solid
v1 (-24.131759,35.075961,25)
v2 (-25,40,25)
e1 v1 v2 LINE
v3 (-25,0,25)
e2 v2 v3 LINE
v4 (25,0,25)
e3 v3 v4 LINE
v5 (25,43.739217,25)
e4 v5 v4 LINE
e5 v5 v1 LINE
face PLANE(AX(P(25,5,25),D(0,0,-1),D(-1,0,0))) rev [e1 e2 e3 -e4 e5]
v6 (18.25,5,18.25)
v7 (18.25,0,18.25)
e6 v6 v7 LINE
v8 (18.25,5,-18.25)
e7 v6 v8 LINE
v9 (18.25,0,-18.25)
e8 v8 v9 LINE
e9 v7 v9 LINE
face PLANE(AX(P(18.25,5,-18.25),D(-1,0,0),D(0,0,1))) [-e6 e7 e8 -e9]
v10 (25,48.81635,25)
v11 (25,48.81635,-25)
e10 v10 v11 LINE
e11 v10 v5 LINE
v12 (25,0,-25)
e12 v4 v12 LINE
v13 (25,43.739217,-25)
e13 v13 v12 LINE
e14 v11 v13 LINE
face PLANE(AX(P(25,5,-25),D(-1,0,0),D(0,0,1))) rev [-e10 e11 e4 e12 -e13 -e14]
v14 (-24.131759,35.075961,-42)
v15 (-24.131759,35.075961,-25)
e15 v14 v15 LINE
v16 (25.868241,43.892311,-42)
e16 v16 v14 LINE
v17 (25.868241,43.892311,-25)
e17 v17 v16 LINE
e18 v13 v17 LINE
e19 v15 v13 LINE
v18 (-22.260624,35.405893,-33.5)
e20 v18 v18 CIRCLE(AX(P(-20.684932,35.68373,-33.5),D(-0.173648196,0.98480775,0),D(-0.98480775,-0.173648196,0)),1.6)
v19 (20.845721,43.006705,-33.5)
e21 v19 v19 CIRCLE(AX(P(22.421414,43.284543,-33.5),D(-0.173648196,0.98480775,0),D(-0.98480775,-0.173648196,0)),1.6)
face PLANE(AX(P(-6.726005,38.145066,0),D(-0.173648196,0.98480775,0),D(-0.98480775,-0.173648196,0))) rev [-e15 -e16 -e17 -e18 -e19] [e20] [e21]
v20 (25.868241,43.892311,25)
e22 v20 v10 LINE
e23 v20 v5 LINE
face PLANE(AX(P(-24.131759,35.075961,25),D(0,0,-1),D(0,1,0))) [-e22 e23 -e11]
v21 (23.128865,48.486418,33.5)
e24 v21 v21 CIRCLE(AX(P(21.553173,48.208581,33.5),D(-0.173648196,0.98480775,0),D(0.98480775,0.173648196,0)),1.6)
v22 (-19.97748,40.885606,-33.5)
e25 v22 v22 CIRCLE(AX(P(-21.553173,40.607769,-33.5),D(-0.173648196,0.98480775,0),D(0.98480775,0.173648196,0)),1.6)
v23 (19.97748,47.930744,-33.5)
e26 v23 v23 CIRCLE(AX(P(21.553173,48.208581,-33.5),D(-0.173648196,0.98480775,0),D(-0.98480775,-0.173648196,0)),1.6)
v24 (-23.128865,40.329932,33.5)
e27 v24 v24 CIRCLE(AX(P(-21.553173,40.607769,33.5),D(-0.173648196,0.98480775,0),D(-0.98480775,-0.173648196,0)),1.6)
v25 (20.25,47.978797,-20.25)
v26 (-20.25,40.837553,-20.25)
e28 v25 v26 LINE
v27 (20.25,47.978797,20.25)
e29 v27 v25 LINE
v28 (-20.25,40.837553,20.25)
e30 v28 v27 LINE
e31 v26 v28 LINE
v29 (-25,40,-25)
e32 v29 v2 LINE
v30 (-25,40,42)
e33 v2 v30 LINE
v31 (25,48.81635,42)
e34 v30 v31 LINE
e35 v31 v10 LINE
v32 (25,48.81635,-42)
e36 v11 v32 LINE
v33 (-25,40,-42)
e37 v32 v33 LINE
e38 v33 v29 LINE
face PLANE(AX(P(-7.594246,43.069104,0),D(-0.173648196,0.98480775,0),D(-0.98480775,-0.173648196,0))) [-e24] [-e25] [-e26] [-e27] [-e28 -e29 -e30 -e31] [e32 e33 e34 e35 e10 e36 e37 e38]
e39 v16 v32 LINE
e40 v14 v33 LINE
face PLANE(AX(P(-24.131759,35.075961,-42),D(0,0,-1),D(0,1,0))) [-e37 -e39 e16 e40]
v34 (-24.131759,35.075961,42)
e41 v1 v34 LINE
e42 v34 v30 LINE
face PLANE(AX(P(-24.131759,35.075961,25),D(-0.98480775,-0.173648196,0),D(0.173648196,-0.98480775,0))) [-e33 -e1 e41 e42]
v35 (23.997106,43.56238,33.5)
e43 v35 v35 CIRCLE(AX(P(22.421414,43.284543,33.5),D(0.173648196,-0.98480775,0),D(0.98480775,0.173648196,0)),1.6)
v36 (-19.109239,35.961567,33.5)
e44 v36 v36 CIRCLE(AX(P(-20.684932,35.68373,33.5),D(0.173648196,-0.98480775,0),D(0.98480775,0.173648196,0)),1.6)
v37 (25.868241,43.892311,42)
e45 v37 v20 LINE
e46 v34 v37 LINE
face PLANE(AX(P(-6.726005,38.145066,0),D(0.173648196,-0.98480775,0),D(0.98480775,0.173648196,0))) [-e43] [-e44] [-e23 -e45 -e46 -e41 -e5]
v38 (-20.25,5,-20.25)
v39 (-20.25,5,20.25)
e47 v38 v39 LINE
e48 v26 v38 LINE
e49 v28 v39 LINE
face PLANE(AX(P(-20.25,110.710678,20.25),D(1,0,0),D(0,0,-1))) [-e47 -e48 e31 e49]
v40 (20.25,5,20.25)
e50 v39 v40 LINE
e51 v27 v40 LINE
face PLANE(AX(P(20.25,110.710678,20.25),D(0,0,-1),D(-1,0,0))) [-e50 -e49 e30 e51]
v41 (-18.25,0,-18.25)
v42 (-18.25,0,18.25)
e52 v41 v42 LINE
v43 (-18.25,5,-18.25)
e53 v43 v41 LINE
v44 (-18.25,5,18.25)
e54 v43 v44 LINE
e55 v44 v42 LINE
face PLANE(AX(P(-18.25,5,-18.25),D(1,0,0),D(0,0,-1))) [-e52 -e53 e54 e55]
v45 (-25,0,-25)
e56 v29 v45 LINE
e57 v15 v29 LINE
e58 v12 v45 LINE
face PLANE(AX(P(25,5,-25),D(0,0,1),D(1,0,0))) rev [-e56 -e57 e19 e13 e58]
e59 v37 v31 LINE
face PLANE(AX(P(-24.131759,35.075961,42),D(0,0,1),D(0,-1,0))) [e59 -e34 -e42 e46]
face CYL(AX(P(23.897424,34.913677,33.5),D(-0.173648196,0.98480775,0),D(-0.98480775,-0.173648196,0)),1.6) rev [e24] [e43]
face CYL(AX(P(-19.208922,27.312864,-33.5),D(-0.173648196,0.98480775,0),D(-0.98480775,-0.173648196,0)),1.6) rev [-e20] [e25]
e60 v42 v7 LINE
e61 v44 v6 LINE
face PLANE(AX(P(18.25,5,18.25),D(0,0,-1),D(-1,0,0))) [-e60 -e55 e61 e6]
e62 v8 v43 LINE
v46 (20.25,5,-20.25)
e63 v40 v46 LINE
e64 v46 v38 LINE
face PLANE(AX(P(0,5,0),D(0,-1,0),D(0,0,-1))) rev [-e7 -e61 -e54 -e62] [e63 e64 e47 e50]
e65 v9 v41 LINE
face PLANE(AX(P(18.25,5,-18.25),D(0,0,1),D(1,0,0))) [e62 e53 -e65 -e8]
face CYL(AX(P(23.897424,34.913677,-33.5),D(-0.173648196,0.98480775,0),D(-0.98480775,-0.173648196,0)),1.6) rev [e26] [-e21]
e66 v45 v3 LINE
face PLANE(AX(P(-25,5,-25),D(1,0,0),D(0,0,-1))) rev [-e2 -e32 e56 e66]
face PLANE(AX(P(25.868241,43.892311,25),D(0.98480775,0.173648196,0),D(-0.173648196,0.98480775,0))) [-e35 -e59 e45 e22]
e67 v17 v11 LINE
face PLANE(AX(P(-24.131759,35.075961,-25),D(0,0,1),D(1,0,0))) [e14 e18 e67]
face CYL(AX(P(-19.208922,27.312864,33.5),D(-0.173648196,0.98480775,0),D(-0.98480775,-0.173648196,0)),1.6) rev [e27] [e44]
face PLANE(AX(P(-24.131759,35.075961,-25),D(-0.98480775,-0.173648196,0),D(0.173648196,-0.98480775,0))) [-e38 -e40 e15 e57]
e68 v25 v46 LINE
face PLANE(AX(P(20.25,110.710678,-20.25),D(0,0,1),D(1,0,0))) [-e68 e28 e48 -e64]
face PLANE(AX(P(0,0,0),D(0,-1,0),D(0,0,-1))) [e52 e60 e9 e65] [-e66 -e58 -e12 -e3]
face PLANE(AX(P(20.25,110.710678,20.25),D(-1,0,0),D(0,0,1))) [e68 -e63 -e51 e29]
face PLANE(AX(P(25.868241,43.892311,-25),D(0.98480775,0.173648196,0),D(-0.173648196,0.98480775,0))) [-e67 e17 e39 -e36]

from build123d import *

# Parameters (mm, degrees)
SKETCH2_W             = 50
SKETCH2_H             = 50
SKETCH2_W_2           = 36.5
SKETCH2_H_2           = 36.5
BOSS_EXTRUDE2_DEPTH   = 5
SKETCH1_W             = 50
SKETCH1_H             = 50
SKETCH1_W_2           = 40.5
SKETCH1_H_2           = 40.5
BOSS_EXTRUDE4_DEPTH   = 40
BOSS_EXTRUDE5_START   = -25
BOSS_EXTRUDE5_DEPTH   = 50
BOSS_EXTRUDE5_2_DEPTH = 4.75
BOSS_EXTRUDE5_START_2 = 20.25
BOSS_EXTRUDE5_3_DEPTH = 4.75
SKETCH7_W             = 50.771330761
SKETCH7_H             = 17
BOSS_EXTRUDE6_DEPTH   = 5
SKETCH8_R             = 1.6
CUT_EXTRUDE1_DEPTH    = 13.5


# Read off the part's stored shape, not the designer's step: Boss-Extrude5
with BuildPart() as part:
    # Sketch2 → Boss-Extrude2 (new body)
    with BuildSketch(Plane(origin=(0, 0, 0), x_dir=(1, 0, 0), z_dir=(0, 1, 0))):
        Rectangle(SKETCH2_W, SKETCH2_H)
        Rectangle(SKETCH2_W_2, SKETCH2_H_2, mode=Mode.SUBTRACT)
    extrude(amount=BOSS_EXTRUDE2_DEPTH)

    # Sketch1 → Boss-Extrude4 (add)
    with BuildSketch(Plane(origin=(0, 0, 0), x_dir=(1, 0, 0), z_dir=(0, 1, 0))):
        Rectangle(SKETCH1_W, SKETCH1_H)
        Rectangle(SKETCH1_W_2, SKETCH1_H_2, mode=Mode.SUBTRACT)
    extrude(amount=BOSS_EXTRUDE4_DEPTH)

    # Boss-Extrude5 outline → Boss-Extrude5 (add)
    with BuildSketch(Plane.XY.offset(BOSS_EXTRUDE5_START)):
        Polygon((25, 40), (25, 48.81635), (20.25, 47.97879675), (20.25, 40), align=None)
        Polygon((-20.25, 40), (-20.25, 40.83755325), (-25, 40), align=None)
    extrude(amount=BOSS_EXTRUDE5_DEPTH)

    # Boss-Extrude5 2 outline → Boss-Extrude5 2 (add)
    with BuildSketch(Plane.XY.offset(BOSS_EXTRUDE5_START)):
        Polygon((20.25, 40), (20.25, 47.97879675), (-20.25, 40.83755325), (-20.25, 40), align=None)
    extrude(amount=BOSS_EXTRUDE5_2_DEPTH)

    # Boss-Extrude5 3 outline → Boss-Extrude5 3 (add)
    with BuildSketch(Plane.XY.offset(BOSS_EXTRUDE5_START_2)):
        Polygon((20.25, 40), (20.25, 47.97879675), (-20.25, 40.83755325), (-20.25, 40), align=None)
    extrude(amount=BOSS_EXTRUDE5_3_DEPTH)

    # Sketch7 → Boss-Extrude6 (add)
    with BuildSketch(Plane(origin=(-7.59424597, 43.069104391, 0), x_dir=(0.984807749763281, 0.17364819609251012, 0), z_dir=(-0.17364819609251012, 0.984807749763281, 0))):
        with Locations((7.71139948, 33.5)):
            Rectangle(SKETCH7_W, SKETCH7_H)
        with Locations((7.71139948, -33.5)):
            Rectangle(SKETCH7_W, SKETCH7_H)
    extrude(amount=-BOSS_EXTRUDE6_DEPTH)

    # Sketch8 → Cut-Extrude1 (cut)
    with BuildSketch(Plane(origin=(-7.59424597, 43.069104391, 0), x_dir=(0.984807749763281, 0.17364819609251012, 0), z_dir=(-0.17364819609251012, 0.984807749763281, 0))):
        with Locations(Location((-14.1742659, -33.5, 0), (0, 0, 180))):
            Circle(SKETCH8_R)
        with Locations((29.597064861, -33.5)):
            Circle(SKETCH8_R)
        with Locations(Location((29.597064861, 33.5, 0), (0, 0, 180))):
            Circle(SKETCH8_R)
        with Locations(Location((-14.1742659, 33.5, 0), (0, 0, 180))):
            Circle(SKETCH8_R)
    extrude(amount=-CUT_EXTRUDE1_DEPTH, mode=Mode.SUBTRACT)


solid = part.part
